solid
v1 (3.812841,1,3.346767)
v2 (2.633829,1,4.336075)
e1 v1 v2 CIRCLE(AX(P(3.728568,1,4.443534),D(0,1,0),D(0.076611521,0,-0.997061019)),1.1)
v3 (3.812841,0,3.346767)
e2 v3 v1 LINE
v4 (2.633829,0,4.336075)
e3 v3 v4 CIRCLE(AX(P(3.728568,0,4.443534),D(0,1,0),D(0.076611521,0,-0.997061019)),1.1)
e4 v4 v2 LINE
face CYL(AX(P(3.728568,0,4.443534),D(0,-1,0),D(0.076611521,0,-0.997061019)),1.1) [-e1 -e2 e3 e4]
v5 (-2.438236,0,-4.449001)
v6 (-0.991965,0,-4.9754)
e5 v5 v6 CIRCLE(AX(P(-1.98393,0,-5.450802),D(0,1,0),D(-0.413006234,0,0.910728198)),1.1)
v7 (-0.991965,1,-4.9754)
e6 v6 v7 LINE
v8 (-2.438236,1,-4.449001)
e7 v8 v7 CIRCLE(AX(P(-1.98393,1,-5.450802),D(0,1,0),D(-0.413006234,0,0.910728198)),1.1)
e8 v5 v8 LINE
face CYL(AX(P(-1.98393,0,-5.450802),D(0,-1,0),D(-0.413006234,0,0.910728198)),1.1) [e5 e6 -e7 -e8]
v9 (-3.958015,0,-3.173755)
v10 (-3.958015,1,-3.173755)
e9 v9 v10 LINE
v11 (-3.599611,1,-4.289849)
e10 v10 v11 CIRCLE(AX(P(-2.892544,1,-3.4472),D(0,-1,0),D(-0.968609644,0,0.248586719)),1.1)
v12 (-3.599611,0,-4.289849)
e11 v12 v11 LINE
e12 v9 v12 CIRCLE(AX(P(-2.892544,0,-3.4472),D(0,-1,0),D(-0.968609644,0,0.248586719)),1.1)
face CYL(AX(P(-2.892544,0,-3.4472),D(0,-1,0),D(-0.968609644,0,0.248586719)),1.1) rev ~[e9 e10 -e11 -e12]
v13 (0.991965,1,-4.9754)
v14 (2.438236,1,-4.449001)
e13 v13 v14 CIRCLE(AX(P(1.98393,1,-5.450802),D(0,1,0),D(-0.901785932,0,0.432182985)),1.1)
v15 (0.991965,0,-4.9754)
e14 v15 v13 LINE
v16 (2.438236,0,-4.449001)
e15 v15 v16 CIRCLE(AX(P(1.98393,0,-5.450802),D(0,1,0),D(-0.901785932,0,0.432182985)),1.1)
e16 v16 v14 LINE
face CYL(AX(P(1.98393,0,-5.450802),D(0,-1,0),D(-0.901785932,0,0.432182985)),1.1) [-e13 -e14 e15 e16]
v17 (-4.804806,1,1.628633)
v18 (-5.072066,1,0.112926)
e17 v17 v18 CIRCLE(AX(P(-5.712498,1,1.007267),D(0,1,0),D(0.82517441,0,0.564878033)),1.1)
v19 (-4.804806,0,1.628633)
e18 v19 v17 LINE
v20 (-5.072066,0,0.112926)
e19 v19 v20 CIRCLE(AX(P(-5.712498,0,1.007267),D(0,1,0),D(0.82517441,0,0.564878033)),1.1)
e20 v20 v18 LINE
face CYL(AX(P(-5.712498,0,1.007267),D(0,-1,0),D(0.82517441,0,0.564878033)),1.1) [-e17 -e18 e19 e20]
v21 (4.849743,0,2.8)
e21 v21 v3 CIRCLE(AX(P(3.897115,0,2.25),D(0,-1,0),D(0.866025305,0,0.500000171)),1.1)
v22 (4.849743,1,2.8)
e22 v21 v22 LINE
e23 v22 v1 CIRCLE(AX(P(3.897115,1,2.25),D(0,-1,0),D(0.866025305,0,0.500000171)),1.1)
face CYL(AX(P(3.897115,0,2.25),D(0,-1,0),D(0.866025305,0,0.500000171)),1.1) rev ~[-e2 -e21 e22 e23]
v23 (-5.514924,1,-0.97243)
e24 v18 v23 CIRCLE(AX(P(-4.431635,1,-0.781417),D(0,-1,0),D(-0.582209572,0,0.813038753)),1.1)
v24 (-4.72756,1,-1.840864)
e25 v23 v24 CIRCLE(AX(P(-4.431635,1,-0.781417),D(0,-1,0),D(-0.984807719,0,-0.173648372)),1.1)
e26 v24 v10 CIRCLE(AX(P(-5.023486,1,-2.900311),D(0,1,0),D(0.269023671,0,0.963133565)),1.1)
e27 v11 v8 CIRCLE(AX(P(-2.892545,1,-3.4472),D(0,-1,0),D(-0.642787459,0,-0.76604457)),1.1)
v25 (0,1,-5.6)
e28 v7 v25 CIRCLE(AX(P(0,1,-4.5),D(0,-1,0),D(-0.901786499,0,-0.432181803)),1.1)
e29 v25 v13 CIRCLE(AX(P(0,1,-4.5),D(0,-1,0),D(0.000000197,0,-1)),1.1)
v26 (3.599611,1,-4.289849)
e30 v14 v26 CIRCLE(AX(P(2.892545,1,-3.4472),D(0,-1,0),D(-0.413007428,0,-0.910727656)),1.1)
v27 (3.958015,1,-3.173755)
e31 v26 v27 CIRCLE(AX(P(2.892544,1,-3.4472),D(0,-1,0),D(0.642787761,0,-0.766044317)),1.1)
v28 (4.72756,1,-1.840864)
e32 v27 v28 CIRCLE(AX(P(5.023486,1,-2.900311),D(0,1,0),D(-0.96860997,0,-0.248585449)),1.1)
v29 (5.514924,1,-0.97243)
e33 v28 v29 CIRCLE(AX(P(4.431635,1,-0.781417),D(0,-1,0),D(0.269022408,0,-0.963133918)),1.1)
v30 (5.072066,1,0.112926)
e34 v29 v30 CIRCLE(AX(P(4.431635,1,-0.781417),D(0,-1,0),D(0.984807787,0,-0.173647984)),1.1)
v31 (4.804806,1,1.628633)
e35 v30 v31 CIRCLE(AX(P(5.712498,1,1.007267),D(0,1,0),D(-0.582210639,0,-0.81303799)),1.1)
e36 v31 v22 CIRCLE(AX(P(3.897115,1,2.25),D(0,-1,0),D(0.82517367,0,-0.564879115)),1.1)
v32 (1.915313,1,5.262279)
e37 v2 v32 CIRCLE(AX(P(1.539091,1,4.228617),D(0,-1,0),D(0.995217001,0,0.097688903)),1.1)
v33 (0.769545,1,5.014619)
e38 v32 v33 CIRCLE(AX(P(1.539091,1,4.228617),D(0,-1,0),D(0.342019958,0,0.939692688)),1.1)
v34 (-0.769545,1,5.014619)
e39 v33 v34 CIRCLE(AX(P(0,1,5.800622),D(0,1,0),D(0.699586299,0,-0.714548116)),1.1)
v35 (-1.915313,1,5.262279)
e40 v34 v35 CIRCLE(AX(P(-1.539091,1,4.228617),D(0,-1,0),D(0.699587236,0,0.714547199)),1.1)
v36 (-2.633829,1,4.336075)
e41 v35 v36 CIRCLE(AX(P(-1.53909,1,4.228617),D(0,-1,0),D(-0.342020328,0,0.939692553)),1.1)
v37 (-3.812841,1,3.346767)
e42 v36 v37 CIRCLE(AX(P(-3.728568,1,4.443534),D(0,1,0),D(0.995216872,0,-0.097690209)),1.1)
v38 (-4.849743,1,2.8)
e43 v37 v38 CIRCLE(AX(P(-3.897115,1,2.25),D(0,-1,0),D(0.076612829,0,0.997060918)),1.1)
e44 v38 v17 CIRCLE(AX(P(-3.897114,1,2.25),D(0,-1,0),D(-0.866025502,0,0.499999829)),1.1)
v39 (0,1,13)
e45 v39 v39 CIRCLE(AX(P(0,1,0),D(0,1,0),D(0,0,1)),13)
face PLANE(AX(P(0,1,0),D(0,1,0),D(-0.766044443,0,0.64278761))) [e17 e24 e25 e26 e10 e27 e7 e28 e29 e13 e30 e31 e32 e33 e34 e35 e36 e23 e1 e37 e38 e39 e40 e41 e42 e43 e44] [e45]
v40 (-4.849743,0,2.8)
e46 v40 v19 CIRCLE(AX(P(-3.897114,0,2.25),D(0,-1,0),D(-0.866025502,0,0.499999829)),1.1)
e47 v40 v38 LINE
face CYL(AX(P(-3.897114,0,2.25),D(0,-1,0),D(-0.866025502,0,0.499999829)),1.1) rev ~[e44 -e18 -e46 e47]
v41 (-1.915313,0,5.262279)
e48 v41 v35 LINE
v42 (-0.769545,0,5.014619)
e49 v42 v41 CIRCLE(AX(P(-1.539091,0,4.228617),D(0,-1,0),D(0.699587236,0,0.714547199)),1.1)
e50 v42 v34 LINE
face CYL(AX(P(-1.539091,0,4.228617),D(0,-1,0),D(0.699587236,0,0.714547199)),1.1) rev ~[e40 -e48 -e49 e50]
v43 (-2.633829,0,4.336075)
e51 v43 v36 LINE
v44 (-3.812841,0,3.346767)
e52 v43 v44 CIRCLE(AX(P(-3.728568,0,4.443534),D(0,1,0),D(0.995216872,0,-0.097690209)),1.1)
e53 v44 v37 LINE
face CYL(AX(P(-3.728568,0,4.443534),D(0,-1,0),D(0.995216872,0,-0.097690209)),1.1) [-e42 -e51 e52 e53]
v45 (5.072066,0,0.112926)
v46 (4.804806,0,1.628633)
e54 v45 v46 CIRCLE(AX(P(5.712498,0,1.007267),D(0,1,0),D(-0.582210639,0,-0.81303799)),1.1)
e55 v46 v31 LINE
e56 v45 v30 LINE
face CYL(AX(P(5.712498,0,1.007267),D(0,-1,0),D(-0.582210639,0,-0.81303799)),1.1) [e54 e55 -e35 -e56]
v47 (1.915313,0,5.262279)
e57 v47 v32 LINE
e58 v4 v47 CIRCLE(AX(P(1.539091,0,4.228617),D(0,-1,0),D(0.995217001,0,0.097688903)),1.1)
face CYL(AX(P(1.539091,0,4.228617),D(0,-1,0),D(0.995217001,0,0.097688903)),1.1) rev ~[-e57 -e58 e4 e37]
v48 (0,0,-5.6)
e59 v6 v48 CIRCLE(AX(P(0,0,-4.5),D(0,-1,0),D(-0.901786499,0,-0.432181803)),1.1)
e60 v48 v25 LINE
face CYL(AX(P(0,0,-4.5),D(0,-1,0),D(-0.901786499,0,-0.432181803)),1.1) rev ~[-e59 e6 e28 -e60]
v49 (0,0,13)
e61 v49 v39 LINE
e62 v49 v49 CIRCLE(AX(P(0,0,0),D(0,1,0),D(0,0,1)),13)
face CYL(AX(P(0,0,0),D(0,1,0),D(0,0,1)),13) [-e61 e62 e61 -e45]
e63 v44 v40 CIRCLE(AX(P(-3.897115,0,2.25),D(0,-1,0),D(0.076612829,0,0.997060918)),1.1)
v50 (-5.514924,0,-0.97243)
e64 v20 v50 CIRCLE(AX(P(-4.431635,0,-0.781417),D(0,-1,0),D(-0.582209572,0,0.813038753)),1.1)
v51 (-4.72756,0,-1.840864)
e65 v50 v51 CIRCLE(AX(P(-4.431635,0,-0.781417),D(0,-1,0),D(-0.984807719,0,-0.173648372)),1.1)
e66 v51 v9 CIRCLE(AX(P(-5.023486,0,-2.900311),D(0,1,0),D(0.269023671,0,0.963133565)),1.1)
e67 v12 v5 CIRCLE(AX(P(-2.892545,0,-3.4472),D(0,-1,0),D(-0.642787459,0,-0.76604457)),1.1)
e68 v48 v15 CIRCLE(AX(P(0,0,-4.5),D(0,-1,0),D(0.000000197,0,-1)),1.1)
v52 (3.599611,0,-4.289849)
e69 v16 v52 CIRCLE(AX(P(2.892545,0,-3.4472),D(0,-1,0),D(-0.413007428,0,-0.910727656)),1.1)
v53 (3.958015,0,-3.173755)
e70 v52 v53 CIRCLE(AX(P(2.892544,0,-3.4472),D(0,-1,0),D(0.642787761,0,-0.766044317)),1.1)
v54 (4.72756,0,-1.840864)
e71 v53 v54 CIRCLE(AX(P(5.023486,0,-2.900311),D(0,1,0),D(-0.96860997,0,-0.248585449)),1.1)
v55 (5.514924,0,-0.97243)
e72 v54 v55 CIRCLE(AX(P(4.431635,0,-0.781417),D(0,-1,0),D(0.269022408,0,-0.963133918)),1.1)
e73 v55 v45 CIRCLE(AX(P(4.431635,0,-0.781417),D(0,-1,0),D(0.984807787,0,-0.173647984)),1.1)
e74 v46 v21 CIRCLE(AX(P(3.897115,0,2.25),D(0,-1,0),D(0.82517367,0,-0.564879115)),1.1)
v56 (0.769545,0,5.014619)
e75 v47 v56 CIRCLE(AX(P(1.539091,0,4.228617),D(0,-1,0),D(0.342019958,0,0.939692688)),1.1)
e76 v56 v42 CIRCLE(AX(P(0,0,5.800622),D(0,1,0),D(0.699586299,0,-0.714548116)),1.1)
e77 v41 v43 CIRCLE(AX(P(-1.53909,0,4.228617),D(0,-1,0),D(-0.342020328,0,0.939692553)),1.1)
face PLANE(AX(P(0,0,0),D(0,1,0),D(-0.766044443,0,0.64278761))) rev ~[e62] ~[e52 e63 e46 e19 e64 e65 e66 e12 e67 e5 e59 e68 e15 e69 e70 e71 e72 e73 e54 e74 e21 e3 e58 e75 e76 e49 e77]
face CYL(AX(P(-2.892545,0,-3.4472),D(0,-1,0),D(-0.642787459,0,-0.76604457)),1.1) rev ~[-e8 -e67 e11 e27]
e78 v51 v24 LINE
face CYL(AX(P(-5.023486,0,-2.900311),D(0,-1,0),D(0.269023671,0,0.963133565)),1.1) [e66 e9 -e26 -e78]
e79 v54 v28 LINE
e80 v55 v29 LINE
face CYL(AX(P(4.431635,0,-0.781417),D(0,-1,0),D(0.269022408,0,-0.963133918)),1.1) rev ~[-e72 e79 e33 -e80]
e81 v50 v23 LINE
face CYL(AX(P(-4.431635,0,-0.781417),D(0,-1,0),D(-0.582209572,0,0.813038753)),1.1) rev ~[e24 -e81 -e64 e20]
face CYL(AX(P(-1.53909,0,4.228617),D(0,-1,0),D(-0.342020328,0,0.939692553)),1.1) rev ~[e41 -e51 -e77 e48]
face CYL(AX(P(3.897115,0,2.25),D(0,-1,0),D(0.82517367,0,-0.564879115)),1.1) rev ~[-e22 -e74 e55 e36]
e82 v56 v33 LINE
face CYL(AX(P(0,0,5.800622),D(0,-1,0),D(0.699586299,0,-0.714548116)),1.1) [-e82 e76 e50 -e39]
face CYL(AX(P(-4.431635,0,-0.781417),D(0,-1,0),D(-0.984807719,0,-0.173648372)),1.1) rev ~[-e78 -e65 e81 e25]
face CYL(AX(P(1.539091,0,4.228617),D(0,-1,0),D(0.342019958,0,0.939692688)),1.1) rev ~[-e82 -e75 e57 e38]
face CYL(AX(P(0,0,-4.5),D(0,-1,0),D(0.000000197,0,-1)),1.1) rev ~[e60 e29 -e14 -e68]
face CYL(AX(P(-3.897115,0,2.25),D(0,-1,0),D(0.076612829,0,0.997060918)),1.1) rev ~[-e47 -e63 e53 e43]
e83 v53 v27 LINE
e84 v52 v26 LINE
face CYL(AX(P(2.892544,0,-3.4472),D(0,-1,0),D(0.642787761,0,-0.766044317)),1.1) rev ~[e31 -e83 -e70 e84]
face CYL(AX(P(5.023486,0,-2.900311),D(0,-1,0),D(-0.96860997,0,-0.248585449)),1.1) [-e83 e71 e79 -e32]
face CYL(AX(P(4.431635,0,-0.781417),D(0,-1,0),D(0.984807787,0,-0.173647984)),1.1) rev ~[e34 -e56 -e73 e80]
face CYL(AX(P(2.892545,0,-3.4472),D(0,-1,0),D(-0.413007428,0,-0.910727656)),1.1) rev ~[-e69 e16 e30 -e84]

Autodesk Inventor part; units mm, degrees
ref_plane "YZ Plane" through (0, 0, 0) normal (1, 0, 0) x (0, 1, 0)
ref_plane "XZ Plane" through (0, 0, 0) normal (0, 1, 0) x (-1, 0, 0)
ref_plane "XY Plane" through (0, 0, 0) normal (0, 0, 1) x (1, 0, 0)
sketch "Skizze1" plane through (0, 0, 0) normal (1, 0, 0) x (0, 1, 0)
  line L0 (0, 0) -> (5, 0)
  line L1 (0, 5.6) -> (0, 13)
  line L2 (0, 13) -> (1, 13)
  line L3 (1, 13) -> (1, 5.6)
  line L4 (0, 5.6) -> (1, 5.6)
  dimension "d0" = 1
  dimension "d1" = 26
  dimension "d55" = 11.2
revolve "Umdrehung1" add sketch "Skizze1" angle 360 about axis through (0, 0, 0) along (0, 1, 0)
sketch "Skizze7" plane through (0, 0, 0) normal (0, 1, 0) x (-1, 0, 0)
  circle A0 centre (0, 0) radius 5.6
  line L0 (0, 0) -> (0, 5.6) construction
  line L1 (0, 0) -> (3.599611, 4.289849) construction
  arc A1 (-0.769545, 5.014619) -> (-1.915313, 5.262279) centre (-1.539091, 4.228617) ccw
  arc A2 (1.915313, 5.262279) -> (0.769545, 5.014619) centre (1.539091, 4.228617) ccw
  arc A3 (-0.769545, 5.014619) -> (0.769545, 5.014619) centre (0, 5.800622) ccw
  line L2 (1.915313, 5.262279) -> (0, 0) construction
  point P0 (0, 0)
  point P1 (0, 4.700622)
  dimension "d75" = 40
  dimension "d76" = 1.1
  dimension "d85" = 1.1
  dimension "d86" = 4.70062
  dimension "d87" = 20
sketch "Skizze7 outline for Extrusion2" plane through (0, 0, 0) normal (0, 1, 0) x (-1, 0, 0)
  arc A0 (-0.769545, 5.014619) -> (0.769545, 5.014619) centre (0, 5.800622) ccw
  arc A1 (-1.915313, 5.262279) -> (-0.769545, 5.014619) centre (-1.539091, 4.228617) cw
  arc A2 (1.915313, 5.262279) -> (-1.915313, 5.262279) centre (0, 0) ccw
  arc A3 (0.769545, 5.014619) -> (1.915313, 5.262279) centre (1.539091, 4.228617) cw
extrude "Extrusion2" add sketch "Skizze7 outline for Extrusion2" along normal up to surface (1 mm away)
pattern_circular "Runde Anordnung1" count 9 over 360 about axis through (0, -10, 0) along (0, 1, 0) of "Extrusion2"
properties part number "Encoder Disk Halter" material "Aluminium 6061"
